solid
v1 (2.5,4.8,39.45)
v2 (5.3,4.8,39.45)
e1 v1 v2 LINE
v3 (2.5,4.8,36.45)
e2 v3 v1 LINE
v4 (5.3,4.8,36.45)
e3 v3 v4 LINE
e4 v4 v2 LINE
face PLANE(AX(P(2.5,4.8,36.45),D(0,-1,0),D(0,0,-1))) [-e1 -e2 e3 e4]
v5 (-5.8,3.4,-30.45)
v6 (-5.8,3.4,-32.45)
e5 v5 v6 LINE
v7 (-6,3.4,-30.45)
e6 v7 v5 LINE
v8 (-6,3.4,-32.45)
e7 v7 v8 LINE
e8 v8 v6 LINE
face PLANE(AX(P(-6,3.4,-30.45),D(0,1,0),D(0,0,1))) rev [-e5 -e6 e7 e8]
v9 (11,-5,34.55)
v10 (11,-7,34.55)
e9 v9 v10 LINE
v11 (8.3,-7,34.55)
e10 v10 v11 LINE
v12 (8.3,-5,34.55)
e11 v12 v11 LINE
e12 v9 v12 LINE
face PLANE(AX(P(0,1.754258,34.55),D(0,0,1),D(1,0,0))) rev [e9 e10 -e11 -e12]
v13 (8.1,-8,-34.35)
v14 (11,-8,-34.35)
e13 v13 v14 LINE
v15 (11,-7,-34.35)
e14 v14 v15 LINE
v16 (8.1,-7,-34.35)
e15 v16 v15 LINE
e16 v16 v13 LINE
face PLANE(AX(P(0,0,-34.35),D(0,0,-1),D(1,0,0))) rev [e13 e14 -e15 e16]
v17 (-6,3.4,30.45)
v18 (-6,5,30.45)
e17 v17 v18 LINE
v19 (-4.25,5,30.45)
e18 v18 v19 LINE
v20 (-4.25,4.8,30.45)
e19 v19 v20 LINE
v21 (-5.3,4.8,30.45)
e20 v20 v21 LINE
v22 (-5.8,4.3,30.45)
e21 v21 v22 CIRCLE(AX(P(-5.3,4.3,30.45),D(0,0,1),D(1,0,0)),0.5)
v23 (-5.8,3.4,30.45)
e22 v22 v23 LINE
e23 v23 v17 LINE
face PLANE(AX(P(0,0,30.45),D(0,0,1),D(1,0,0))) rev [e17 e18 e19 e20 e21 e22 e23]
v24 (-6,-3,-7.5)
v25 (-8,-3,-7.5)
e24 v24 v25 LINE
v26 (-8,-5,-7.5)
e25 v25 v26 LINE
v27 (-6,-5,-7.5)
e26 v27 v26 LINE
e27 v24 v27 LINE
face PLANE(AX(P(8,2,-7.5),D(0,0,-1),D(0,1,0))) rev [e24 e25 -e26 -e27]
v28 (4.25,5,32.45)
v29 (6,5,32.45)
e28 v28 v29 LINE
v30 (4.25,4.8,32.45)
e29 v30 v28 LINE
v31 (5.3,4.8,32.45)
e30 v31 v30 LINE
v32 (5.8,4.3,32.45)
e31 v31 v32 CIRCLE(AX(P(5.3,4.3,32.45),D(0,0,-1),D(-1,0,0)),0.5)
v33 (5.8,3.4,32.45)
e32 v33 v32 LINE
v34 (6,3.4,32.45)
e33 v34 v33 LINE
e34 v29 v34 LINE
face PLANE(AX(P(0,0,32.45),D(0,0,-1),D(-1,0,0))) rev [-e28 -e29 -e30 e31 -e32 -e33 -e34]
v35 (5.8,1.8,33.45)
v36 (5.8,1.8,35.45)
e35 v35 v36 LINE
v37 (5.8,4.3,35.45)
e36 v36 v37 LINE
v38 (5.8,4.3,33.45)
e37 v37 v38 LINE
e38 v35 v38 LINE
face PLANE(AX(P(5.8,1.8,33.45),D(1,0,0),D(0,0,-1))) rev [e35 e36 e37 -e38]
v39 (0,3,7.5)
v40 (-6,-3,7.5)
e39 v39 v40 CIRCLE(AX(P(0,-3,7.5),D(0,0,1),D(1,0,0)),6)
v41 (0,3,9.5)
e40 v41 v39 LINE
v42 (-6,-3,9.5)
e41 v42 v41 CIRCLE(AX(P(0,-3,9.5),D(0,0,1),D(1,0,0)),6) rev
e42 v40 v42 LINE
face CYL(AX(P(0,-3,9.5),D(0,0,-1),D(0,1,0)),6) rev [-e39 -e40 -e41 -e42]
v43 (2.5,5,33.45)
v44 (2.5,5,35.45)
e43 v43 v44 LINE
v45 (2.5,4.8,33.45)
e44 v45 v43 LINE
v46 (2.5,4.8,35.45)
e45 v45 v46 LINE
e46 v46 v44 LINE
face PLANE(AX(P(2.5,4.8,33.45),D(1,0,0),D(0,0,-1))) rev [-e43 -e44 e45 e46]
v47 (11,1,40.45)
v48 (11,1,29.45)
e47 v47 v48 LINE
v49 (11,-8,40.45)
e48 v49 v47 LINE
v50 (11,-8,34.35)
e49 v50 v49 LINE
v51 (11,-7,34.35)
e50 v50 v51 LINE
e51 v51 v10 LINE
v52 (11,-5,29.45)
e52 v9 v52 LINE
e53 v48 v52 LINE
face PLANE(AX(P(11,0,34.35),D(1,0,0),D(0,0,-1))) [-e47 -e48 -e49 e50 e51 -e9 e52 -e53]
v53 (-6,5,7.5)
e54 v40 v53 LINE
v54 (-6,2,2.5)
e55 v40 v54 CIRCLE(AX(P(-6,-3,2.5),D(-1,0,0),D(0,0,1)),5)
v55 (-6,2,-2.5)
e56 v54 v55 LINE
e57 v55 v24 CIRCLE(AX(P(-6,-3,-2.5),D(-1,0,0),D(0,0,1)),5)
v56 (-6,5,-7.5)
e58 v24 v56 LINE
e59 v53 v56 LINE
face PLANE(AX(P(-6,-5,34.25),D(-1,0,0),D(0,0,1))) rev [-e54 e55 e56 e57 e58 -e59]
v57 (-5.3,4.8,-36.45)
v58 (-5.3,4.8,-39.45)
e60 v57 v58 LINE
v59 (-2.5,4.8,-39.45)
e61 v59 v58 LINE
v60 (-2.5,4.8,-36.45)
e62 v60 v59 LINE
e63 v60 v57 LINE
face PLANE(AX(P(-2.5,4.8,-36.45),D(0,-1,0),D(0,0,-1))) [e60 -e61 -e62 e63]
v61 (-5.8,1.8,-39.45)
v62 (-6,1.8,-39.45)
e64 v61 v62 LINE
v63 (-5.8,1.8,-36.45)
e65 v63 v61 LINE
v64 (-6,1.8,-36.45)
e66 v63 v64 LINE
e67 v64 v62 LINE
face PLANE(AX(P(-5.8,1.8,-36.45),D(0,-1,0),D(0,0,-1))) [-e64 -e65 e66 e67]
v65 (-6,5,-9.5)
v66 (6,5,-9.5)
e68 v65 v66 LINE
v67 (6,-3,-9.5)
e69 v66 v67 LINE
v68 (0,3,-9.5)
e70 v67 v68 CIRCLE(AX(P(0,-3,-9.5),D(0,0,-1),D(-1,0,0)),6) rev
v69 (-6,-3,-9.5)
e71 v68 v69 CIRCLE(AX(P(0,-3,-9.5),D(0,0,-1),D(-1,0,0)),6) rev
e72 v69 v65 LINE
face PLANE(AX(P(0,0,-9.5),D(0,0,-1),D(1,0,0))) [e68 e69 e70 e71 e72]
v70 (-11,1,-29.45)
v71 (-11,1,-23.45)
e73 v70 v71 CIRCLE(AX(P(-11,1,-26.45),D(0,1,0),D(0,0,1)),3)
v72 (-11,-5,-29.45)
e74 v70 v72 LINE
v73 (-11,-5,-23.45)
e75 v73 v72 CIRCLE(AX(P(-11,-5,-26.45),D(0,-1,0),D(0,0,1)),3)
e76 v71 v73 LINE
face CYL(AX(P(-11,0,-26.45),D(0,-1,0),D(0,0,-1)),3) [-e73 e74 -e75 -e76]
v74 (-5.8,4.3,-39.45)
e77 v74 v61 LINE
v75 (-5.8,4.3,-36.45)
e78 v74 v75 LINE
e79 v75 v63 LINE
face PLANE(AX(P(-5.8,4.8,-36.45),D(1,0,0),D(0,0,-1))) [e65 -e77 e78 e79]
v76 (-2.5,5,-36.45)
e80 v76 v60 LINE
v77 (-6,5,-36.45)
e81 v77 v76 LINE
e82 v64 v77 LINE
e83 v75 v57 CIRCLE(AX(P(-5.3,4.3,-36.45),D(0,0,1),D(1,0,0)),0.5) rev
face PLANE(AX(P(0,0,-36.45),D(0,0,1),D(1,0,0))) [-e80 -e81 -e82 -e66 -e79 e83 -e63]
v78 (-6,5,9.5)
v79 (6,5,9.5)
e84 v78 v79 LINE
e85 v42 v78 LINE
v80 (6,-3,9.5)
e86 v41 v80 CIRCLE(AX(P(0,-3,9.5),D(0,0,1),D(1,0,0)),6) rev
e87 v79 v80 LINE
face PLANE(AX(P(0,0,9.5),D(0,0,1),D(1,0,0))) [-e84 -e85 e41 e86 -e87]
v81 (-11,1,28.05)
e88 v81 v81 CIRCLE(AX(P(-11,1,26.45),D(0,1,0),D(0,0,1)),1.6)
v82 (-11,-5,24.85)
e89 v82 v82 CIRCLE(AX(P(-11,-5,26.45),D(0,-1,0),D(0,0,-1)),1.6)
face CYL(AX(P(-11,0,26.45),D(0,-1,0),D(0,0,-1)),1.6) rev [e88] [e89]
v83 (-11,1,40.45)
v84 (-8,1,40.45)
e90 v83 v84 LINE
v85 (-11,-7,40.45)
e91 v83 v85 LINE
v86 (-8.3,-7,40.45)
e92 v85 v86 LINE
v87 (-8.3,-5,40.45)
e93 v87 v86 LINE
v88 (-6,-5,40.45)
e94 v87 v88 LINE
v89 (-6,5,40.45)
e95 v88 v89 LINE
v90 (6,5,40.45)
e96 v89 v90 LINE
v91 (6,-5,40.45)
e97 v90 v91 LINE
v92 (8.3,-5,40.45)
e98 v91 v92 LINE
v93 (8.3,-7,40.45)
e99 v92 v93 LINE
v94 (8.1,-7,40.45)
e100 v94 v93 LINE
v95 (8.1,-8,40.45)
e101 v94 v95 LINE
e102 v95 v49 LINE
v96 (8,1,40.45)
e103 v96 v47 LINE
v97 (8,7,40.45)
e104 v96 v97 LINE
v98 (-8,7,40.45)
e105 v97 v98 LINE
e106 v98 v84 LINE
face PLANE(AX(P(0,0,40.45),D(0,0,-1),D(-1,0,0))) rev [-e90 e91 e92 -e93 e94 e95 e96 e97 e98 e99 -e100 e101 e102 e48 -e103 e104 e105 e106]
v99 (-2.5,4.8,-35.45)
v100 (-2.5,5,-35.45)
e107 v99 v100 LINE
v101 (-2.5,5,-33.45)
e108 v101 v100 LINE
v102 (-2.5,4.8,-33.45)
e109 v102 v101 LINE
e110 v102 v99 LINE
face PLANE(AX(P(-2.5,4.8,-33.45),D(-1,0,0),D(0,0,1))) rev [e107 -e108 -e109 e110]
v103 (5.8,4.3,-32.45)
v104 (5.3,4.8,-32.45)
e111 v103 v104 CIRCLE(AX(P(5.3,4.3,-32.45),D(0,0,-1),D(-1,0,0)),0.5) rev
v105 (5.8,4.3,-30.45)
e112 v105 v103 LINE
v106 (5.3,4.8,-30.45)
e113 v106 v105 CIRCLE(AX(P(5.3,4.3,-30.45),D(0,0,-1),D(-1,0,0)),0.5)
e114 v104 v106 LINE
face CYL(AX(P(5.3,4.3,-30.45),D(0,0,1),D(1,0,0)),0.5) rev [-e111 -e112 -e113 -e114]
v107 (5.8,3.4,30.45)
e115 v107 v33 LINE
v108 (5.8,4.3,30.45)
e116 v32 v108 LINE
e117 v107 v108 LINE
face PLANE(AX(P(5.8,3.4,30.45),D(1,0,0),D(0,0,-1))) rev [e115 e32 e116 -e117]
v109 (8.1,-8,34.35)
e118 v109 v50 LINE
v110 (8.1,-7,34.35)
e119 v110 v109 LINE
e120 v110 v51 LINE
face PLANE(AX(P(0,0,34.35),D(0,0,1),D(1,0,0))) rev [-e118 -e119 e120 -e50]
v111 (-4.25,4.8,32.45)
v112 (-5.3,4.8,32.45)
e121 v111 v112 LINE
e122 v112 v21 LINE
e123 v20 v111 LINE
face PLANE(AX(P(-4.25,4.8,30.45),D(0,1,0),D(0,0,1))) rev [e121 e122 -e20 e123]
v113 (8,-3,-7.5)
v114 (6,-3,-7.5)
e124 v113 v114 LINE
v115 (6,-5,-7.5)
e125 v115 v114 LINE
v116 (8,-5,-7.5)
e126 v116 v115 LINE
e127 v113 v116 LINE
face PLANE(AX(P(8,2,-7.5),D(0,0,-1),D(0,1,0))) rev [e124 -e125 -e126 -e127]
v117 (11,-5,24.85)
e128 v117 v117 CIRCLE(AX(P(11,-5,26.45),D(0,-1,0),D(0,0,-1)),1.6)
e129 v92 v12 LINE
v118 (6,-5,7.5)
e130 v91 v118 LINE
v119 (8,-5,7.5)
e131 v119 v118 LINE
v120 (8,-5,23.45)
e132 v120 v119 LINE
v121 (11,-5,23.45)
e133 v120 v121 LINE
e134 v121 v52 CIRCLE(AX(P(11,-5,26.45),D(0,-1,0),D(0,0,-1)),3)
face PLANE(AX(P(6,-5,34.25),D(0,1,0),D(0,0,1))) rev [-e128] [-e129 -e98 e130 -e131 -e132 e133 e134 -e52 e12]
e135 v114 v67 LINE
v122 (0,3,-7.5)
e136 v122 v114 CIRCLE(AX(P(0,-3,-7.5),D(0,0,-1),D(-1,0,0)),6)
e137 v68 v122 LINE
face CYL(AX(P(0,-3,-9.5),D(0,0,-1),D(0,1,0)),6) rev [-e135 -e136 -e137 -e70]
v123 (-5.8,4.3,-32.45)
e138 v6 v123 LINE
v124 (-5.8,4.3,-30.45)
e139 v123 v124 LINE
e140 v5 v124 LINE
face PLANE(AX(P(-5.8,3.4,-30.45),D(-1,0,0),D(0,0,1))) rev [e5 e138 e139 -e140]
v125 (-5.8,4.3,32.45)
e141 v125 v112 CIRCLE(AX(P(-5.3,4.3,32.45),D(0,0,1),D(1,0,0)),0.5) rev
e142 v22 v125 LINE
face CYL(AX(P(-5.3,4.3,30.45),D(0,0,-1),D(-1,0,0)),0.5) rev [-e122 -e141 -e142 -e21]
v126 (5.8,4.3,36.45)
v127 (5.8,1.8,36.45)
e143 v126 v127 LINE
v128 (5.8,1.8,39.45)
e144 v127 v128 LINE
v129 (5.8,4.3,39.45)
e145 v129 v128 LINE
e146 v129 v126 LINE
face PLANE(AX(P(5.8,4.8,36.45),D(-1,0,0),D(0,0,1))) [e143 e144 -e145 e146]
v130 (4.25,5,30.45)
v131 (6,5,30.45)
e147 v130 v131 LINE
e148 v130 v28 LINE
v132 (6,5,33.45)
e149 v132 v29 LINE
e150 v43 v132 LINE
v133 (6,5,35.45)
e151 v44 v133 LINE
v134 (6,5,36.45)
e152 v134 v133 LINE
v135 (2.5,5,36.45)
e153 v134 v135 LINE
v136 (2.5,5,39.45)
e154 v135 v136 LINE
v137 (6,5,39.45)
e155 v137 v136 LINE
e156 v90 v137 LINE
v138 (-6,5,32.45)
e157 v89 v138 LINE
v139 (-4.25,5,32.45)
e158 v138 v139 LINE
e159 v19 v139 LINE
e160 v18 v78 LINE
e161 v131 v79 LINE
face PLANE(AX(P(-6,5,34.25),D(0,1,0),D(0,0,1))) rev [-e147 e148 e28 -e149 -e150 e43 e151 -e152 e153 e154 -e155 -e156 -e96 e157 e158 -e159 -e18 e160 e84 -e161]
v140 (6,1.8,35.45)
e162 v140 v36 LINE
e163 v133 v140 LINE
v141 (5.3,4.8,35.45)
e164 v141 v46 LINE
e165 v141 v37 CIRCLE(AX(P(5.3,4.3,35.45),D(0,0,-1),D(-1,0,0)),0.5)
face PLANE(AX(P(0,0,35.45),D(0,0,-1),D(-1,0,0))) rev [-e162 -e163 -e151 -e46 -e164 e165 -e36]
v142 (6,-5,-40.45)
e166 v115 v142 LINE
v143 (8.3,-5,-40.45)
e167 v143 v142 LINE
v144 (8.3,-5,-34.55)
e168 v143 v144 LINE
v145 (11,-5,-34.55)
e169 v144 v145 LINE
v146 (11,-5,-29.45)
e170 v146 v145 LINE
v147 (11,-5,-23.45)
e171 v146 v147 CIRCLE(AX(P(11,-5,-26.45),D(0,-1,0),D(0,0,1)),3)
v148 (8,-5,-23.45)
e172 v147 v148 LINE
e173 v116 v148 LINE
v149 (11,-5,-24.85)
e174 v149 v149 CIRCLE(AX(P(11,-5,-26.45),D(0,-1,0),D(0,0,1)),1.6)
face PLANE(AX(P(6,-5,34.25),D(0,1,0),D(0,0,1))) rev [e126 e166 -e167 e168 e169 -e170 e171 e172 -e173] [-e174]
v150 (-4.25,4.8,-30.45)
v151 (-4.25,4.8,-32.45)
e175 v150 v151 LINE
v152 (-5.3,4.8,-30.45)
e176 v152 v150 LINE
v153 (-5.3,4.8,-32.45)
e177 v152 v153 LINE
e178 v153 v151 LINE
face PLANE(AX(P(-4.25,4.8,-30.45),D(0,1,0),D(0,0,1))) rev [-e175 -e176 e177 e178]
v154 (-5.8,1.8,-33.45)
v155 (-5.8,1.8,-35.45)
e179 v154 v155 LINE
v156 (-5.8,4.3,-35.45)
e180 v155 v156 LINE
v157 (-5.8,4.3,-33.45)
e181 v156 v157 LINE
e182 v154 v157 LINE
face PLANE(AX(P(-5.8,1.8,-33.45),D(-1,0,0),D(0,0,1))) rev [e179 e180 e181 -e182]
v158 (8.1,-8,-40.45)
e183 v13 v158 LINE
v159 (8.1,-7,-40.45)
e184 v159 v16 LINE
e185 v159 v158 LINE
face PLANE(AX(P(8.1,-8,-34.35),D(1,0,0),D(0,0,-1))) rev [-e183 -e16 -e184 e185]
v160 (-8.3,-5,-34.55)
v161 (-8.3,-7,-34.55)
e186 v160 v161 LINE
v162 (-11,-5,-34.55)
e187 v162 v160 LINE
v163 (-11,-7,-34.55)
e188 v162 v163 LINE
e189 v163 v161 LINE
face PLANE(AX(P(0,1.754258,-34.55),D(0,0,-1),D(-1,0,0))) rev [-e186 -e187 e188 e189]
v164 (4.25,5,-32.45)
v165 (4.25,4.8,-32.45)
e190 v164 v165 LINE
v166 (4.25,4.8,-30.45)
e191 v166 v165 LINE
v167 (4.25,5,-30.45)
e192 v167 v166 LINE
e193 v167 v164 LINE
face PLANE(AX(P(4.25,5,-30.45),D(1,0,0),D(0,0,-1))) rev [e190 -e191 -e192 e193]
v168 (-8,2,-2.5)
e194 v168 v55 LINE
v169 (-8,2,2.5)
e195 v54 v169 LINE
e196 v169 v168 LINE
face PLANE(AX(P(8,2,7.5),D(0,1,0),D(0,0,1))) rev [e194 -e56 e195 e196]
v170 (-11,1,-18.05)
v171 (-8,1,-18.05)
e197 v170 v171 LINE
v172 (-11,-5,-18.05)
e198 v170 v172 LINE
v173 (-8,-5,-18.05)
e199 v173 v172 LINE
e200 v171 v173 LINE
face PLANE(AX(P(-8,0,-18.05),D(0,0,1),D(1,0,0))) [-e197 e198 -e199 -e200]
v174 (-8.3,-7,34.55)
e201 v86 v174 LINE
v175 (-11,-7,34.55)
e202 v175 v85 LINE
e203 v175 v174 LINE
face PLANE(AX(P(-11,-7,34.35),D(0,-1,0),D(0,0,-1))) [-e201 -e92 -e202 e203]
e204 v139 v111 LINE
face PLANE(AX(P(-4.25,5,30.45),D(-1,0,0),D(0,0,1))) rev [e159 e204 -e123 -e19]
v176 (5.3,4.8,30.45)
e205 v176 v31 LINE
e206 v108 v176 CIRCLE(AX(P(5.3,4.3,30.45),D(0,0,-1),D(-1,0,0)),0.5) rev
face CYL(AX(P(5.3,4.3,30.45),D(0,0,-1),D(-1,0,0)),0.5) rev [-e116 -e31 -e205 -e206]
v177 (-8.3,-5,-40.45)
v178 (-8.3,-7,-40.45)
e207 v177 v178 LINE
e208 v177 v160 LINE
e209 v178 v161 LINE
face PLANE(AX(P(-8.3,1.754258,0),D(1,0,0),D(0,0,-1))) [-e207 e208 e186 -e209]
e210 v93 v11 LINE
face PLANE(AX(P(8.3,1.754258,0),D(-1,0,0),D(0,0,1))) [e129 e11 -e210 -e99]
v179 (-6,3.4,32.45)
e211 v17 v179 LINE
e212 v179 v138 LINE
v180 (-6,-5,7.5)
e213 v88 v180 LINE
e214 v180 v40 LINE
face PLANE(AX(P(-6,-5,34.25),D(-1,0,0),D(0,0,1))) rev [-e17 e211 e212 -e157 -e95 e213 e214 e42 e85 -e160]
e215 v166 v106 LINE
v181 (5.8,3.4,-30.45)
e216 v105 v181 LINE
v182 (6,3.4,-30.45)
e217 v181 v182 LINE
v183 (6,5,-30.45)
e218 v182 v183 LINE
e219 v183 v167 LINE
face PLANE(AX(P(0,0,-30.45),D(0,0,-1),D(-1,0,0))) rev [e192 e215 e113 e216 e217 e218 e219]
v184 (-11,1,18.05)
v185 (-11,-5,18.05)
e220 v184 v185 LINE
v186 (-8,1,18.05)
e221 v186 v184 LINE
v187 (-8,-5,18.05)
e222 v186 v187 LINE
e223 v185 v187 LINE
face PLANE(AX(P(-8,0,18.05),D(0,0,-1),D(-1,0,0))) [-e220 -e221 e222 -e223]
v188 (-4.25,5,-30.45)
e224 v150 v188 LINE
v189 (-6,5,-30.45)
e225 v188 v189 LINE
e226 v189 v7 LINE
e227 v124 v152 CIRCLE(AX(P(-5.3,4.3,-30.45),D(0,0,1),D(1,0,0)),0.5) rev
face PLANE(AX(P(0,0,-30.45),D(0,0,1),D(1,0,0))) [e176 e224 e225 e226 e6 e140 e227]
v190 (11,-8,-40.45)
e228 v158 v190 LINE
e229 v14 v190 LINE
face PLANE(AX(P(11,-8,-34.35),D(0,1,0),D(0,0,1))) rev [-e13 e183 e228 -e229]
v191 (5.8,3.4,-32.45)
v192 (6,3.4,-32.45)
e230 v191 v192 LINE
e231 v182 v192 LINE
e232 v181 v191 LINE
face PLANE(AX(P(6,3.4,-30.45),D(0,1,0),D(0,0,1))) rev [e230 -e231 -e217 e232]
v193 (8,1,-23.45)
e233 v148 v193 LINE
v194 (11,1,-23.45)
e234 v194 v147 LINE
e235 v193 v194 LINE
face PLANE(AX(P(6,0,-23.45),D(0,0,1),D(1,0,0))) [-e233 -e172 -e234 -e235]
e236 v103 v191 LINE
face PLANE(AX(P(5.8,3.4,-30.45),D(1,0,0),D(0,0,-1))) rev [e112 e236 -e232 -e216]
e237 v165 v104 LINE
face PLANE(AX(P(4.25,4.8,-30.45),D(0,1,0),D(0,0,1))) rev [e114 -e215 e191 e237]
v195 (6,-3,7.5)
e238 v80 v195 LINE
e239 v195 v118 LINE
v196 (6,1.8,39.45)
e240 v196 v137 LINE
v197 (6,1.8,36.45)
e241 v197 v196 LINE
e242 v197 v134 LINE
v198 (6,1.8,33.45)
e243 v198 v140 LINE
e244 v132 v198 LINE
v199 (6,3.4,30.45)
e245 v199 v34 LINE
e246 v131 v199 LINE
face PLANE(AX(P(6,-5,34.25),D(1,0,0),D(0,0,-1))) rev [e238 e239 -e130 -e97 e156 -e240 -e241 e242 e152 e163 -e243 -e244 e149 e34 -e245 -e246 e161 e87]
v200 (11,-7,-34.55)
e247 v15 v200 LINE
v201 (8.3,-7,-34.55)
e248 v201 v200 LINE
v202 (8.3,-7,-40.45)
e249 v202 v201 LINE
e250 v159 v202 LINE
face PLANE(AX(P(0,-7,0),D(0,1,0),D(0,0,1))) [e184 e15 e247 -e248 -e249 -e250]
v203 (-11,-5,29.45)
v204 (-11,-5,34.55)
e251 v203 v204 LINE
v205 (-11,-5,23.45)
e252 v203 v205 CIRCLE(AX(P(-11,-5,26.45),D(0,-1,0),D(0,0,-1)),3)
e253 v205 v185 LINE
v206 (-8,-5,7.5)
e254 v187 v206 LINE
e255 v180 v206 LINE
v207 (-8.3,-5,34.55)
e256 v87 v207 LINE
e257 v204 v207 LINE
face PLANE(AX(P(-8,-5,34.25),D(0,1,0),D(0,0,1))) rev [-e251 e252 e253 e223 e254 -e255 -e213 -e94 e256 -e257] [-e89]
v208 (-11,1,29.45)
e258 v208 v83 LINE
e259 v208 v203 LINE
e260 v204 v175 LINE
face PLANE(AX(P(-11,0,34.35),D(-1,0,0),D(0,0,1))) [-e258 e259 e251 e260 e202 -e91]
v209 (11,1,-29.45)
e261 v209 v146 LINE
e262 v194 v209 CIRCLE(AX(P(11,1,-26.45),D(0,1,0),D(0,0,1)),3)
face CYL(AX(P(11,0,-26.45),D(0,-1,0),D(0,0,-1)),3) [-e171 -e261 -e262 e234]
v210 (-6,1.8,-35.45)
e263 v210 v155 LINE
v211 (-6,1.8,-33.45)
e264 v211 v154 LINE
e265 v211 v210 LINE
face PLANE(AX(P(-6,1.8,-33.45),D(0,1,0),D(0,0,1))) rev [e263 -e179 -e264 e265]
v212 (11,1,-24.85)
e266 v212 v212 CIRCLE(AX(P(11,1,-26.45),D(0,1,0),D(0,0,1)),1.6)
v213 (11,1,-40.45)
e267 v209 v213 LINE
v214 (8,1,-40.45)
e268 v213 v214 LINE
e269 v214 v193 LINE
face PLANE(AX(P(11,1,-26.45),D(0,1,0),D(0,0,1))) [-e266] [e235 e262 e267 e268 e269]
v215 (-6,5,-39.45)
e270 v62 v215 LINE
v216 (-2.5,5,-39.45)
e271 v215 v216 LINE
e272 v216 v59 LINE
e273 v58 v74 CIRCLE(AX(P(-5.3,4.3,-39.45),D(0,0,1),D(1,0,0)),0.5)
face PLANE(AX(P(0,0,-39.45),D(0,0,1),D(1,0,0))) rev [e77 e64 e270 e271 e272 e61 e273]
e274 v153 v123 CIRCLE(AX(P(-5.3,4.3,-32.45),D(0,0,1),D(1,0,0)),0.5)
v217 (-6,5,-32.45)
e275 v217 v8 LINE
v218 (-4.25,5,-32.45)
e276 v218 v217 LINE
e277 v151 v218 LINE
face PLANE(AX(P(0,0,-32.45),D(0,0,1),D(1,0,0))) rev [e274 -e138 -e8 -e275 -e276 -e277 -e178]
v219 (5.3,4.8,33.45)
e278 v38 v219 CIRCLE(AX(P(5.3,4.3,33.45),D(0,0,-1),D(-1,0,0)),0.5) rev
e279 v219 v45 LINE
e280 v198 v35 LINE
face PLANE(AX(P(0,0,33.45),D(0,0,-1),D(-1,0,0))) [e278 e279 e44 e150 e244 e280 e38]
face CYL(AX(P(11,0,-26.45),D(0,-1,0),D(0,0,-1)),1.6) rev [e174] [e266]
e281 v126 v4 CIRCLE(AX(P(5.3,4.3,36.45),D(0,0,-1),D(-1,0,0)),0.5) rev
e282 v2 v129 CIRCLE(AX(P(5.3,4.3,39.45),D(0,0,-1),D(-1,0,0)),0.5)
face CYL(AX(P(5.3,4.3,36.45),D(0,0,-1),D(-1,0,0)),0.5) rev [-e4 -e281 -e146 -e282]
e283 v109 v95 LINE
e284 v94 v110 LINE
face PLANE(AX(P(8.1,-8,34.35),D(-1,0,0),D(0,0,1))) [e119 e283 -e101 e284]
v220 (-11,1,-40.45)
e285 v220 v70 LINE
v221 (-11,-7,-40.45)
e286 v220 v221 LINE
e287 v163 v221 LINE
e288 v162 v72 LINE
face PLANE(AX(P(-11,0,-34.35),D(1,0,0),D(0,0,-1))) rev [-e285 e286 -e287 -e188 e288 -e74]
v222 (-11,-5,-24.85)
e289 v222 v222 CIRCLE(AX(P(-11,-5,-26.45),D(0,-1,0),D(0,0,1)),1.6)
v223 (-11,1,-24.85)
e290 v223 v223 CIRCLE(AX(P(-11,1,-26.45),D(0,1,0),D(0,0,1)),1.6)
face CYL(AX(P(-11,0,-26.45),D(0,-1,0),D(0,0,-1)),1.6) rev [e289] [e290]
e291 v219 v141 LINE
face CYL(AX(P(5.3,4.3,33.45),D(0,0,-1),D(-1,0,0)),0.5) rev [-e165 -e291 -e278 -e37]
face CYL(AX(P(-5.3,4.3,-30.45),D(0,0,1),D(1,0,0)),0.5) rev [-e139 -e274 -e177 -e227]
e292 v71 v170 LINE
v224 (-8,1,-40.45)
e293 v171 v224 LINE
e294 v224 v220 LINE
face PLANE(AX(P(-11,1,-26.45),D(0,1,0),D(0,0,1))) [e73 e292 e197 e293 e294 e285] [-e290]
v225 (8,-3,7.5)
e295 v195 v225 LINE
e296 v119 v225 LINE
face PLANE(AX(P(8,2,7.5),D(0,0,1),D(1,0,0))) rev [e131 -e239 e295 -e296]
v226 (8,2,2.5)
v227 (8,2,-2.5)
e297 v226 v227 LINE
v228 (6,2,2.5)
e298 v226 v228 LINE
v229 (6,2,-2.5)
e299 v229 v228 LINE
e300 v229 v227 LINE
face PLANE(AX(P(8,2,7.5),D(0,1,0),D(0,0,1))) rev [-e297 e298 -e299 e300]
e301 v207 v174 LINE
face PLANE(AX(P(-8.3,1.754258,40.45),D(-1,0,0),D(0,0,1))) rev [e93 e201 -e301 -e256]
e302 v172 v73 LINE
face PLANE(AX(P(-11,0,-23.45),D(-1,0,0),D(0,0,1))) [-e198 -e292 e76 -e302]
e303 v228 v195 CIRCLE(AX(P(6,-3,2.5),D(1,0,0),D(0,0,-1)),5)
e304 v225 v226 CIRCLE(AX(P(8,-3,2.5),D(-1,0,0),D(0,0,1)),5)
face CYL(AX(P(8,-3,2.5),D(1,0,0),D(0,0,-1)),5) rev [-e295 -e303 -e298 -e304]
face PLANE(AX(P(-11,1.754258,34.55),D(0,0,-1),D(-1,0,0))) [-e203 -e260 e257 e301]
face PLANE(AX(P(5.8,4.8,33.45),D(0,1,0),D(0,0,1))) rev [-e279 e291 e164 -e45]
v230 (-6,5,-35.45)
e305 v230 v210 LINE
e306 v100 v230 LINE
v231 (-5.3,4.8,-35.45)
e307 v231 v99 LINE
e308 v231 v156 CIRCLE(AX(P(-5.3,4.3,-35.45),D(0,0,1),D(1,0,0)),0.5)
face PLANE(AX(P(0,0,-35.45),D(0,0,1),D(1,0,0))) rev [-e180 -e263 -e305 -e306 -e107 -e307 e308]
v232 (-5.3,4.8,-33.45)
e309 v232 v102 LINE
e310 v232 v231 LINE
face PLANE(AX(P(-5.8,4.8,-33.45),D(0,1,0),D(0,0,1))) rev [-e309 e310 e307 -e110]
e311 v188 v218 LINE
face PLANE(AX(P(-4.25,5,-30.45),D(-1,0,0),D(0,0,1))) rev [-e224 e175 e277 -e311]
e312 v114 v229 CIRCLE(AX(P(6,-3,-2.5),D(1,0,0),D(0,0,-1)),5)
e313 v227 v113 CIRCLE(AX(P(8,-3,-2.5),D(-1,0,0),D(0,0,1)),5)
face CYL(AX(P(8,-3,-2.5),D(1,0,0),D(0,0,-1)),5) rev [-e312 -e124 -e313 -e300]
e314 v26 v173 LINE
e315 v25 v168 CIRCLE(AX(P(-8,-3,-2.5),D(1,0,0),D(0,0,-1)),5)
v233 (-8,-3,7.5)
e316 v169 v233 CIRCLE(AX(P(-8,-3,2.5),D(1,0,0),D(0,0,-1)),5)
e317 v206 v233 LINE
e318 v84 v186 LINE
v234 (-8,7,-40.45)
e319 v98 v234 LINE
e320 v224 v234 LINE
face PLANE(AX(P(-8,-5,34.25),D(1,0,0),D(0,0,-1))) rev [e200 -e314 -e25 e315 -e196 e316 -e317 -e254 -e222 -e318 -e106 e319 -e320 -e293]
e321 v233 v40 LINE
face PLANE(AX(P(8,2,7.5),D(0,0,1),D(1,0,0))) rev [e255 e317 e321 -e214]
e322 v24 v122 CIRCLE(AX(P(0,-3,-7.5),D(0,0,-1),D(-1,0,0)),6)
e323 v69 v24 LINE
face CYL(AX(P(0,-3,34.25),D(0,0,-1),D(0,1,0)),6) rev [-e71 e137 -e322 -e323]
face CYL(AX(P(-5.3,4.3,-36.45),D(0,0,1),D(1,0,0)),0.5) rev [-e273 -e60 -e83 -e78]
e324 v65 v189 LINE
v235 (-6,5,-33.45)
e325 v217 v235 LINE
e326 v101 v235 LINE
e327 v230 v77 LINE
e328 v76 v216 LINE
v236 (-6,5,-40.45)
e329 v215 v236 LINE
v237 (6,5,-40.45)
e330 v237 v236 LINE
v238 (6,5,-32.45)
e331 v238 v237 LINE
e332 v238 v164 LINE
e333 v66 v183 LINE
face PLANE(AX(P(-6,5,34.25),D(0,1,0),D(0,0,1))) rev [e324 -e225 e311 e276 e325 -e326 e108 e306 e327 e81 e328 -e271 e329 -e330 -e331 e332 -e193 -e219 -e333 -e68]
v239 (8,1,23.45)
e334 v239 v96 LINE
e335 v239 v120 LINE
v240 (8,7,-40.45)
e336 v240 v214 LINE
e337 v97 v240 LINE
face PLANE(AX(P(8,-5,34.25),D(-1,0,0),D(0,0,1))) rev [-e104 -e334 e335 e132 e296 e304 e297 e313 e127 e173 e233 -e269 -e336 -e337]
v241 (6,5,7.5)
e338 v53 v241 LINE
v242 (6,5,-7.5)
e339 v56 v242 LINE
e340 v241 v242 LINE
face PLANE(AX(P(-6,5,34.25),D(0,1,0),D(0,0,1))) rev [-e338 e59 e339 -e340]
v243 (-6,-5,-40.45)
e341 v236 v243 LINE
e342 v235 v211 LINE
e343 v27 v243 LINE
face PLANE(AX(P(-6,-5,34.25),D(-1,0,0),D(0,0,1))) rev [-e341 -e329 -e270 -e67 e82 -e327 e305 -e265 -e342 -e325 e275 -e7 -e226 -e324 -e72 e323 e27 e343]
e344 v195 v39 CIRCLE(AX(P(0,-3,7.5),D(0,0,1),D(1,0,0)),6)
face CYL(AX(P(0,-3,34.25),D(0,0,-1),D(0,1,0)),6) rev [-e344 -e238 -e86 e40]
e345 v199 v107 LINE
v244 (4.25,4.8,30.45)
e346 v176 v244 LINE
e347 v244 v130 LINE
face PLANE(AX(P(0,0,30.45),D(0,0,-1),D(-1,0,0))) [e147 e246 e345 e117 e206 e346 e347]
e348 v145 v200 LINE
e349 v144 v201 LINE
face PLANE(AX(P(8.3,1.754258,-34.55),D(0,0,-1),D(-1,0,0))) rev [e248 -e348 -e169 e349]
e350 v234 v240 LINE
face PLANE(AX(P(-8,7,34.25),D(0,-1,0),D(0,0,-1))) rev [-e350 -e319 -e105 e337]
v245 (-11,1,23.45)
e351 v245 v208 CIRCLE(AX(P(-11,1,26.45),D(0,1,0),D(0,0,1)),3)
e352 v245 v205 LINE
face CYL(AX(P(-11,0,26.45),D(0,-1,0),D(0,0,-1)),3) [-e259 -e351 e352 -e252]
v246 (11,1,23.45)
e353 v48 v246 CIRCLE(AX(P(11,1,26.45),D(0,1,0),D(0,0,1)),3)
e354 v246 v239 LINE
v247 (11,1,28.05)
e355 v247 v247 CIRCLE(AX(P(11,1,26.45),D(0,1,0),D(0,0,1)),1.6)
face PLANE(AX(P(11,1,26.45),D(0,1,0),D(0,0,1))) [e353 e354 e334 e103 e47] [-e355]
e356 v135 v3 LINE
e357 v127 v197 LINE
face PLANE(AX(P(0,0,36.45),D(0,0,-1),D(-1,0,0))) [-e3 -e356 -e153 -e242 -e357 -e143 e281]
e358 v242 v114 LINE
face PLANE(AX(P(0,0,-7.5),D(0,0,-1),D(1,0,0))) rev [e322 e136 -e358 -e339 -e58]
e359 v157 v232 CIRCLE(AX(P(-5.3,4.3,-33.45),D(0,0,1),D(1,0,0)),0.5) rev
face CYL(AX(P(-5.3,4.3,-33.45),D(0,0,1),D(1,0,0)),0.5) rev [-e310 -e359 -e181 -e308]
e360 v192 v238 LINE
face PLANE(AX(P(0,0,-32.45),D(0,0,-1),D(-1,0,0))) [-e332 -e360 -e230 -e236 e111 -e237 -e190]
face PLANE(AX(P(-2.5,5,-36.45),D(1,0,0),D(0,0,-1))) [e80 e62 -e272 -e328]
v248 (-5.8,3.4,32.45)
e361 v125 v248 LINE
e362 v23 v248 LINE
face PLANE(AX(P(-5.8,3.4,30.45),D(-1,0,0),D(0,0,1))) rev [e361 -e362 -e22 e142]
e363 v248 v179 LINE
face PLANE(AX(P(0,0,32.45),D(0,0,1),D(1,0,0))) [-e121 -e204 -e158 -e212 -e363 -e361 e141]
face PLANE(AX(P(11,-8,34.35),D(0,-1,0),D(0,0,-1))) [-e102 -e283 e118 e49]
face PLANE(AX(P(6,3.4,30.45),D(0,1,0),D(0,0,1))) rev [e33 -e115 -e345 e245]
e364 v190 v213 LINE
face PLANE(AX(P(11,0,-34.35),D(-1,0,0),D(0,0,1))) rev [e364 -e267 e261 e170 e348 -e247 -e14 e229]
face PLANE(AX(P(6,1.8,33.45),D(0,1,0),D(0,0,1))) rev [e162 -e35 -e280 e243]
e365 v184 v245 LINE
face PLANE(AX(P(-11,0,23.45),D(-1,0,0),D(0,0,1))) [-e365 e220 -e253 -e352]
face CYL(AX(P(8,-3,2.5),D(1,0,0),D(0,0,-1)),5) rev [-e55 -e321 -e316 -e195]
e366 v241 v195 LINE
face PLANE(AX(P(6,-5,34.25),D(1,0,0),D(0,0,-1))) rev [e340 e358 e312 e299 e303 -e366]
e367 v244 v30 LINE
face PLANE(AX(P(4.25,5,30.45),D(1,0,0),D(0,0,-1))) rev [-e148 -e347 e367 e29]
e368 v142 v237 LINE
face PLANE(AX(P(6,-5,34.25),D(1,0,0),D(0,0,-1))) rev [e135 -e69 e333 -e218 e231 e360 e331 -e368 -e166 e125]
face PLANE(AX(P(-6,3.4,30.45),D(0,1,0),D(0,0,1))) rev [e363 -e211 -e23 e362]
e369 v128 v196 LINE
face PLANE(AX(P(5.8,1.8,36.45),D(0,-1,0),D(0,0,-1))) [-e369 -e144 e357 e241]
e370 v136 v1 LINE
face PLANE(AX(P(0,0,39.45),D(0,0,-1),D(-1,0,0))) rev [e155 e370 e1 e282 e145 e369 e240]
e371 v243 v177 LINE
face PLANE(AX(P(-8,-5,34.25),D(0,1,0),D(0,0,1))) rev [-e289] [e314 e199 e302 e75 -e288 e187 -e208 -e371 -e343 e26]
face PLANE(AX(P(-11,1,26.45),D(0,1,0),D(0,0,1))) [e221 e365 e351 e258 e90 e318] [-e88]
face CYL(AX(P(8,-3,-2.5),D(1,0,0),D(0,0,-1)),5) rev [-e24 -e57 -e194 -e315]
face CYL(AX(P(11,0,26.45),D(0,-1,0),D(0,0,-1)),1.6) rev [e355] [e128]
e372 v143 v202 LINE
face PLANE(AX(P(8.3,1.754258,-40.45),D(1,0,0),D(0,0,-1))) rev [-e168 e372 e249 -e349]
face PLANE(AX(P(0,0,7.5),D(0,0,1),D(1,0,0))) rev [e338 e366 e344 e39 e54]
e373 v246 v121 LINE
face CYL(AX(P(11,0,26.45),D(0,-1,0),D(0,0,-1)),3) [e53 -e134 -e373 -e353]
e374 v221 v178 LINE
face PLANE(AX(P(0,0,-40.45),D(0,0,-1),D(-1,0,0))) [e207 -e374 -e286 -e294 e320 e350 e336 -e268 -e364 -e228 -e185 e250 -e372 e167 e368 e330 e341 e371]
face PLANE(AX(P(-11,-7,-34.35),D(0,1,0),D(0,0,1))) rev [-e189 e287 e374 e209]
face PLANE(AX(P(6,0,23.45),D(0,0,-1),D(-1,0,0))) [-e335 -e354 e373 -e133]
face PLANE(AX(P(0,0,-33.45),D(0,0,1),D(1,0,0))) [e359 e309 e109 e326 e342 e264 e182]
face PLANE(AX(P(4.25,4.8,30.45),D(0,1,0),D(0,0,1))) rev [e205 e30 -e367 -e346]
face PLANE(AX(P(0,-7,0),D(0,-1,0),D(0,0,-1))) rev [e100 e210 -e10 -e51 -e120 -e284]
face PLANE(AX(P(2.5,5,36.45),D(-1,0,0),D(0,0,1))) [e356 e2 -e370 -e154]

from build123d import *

# Parameters (mm, degrees)
BOSS_EXTRUDE1_DEPTH      = 34.25
BOSS_EXTRUDE2_DEPTH      = 6.2
BOSS_EXTRUDE3_DEPTH      = 6.2
SKETCH9_R                = 1.6
BOSS_EXTRUDE4_DEPTH      = 5
CUT_EXTRUDE1_START       = -16
SKETCH10_W               = 15
SKETCH10_H               = 7
CUT_EXTRUDE1_DEPTH       = 16
SKETCH11_W               = 12
SKETCH11_H               = 2
BOSS_EXTRUDE5_DEPTH      = 2
FILLET1_R                = 6
BOSS_EXTRUDE6_DEPTH      = 3
BOSS_EXTRUDE7_DEPTH      = 2
BOSS_EXTRUDE8_DEPTH      = 2
CIRPATTERN1_COUNT        = 2
FILLET2_R                = 0.5
FILLET4_R                = 5
BOSS_EXTRUDE9_DEPTH      = 6.1
BOSS_EXTRUDE10_START     = -5
BOSS_EXTRUDE10_OUTLINE_W = 3
BOSS_EXTRUDE10_OUTLINE_H = 4.9
BOSS_EXTRUDE10_DEPTH     = 5
SKETCH17_W               = 3
SKETCH17_H               = 4.9
BOSS_EXTRUDE11_DEPTH     = 5
BOSS_EXTRUDE12_START     = -5
BOSS_EXTRUDE12_OUTLINE_W = 3
BOSS_EXTRUDE12_OUTLINE_H = 5.4
BOSS_EXTRUDE12_DEPTH     = 5
CUT_EXTRUDE2_DEPTH       = 2
SKETCH21_R               = 1.6
BOSS_EXTRUDE13_DEPTH     = 1


# Read off the part's stored shape, not the designer's step: Boss-Extrude10, Boss-Extrude12
# Some blends are built 0.0001 mm under size
with BuildPart() as part:
    # Sketch1 → Boss-Extrude1 (new, symmetric)
    with BuildSketch(Plane.XY):
        Polygon((-8, -5), (-8, 7), (8, 7), (8, -5), (6, -5), (6, 5), (-6, 5), (-6, -5), align=None)
    extrude(amount=BOSS_EXTRUDE1_DEPTH, both=True)

    # Sketch6 → Boss-Extrude2 (add)
    with BuildSketch(Plane.XY.offset(34.25)):
        Polygon((6, 5), (6, -5), (8, -5), (8, 7), (-8, 7), (-8, -5), (-6, -5), (-6, 5), align=None)
    extrude(amount=BOSS_EXTRUDE2_DEPTH)

    # Sketch8 → Boss-Extrude3 (add)
    with BuildSketch(Plane(origin=(0, 0, -34.25), x_dir=(-1, 0, 0), z_dir=(0, 0, -1))):
        Polygon((-6, -5), (-6, 5), (6, 5), (6, -5), (8, -5), (8, 7), (-8, 7), (-8, -5), align=None)
    extrude(amount=BOSS_EXTRUDE3_DEPTH)

    # Sketch9 → Boss-Extrude4 (add)
    # profile 1 of 4: a face of its own
    with BuildSketch(Plane.XZ.offset(5)):
        with BuildLine():
            Line((-11, 29.45), (-6, 29.45))
            Line((-6, 29.45), (-6, 23.45))
            Line((-6, 23.45), (-11, 23.45))
            ThreePointArc((-11, 23.45), (-14, 26.45), (-11, 29.45))
        make_face()
        with Locations(Location((-11, 26.45, 0), (0, 0, 270))):
            Circle(SKETCH9_R, mode=Mode.SUBTRACT)
    # profile 2 of 4: a face of its own
    with BuildSketch(Plane.XZ.offset(5)):
        with BuildLine():
            Line((11, 29.45), (6, 29.45))
            Line((6, 29.45), (6, 23.45))
            Line((6, 23.45), (11, 23.45))
            ThreePointArc((11, 23.45), (14, 26.45), (11, 29.45))
        make_face()
        with Locations(Location((11, 26.45, 0), (0, 0, 270))):
            Circle(SKETCH9_R, mode=Mode.SUBTRACT)
    # profile 3 of 4: a face of its own
    with BuildSketch(Plane.XZ.offset(5)):
        with BuildLine():
            Line((6, -23.45), (11, -23.45))
            ThreePointArc((11, -23.45), (14, -26.45), (11, -29.45))
            Line((11, -29.45), (6, -29.45))
            Line((6, -29.45), (6, -23.45))
        make_face()
        with Locations(Location((11, -26.45, 0), (0, 0, 90))):
            Circle(SKETCH9_R, mode=Mode.SUBTRACT)
    # profile 4 of 4: a face of its own
    with BuildSketch(Plane.XZ.offset(5)):
        with BuildLine():
            Line((-6, -23.45), (-11, -23.45))
            ThreePointArc((-11, -23.45), (-14, -26.45), (-11, -29.45))
            Line((-11, -29.45), (-6, -29.45))
            Line((-6, -29.45), (-6, -23.45))
        make_face()
        with Locations(Location((-11, -26.45, 0), (0, 0, 90))):
            Circle(SKETCH9_R, mode=Mode.SUBTRACT)
    extrude(amount=-BOSS_EXTRUDE4_DEPTH)

    # Sketch10 → Cut-Extrude1 (cut)
    with BuildSketch(Plane.ZY.offset(8).offset(CUT_EXTRUDE1_START)):
        with Locations((0, -1.5)):
            Rectangle(SKETCH10_W, SKETCH10_H)
    extrude(amount=CUT_EXTRUDE1_DEPTH, mode=Mode.SUBTRACT)

    # Sketch11 → Boss-Extrude5 (add)
    with BuildSketch(Plane(origin=(0, 0, 7.5), x_dir=(-1, 0, 0), z_dir=(0, 0, -1))):
        with Locations((0, 4)):
            Rectangle(SKETCH11_W, SKETCH11_H)
    boss_extrude5 = extrude(amount=-BOSS_EXTRUDE5_DEPTH)

    # Mirror1: Boss-Extrude5 across plane
    add(boss_extrude5.mirror(Plane.XY))

    # Fillet1
    # the kernel refuses this fillet: 6 mm, written as the material it adds along each edge
    with BuildSketch(Plane(origin=(-6, 3, -7.5), x_dir=(0, -1, 0), z_dir=(0, 0, -1)), Plane(origin=(6, 3, 7.5), x_dir=(0, -1, 0), z_dir=(0, 0, 1))) as fillet1_piece_1:
        with BuildLine():
            CenterArc((FILLET1_R, -FILLET1_R), FILLET1_R, 90, 90)
            Line((0, -FILLET1_R), (0, 0))
            Line((0, 0), (FILLET1_R, 0))
        make_face()
    extrude(amount=2)
    with BuildSketch(Plane(origin=(6, 3, -7.5), x_dir=(0, -1, 0), z_dir=(0, 0, -1)), Plane(origin=(-6, 3, 7.5), x_dir=(0, -1, 0), z_dir=(0, 0, 1))) as fillet1_piece_2:
        with BuildLine():
            CenterArc((FILLET1_R, FILLET1_R), FILLET1_R, 180, 90)
            Line((0, FILLET1_R), (0, 0))
            Line((0, 0), (FILLET1_R, 0))
        make_face()
    extrude(amount=2)

    # Sketch12 → Boss-Extrude6 (add)
    with BuildSketch(Plane.XY.offset(39.45)):
        Polygon((2.5, 5), (2.5, 4.8), (5.8, 4.8), (5.8, 1.8), (6, 1.8), (6, 5), align=None)
    boss_extrude6 = extrude(amount=-BOSS_EXTRUDE6_DEPTH)

    # Sketch13 → Boss-Extrude7 (add)
    with BuildSketch(Plane(origin=(0, 0, 35.45), x_dir=(-1, 0, 0), z_dir=(0, 0, -1))):
        Polygon((-2.5, 5), (-6, 5), (-6, 1.8), (-5.8, 1.8), (-5.8, 4.8), (-2.5, 4.8), align=None)
    boss_extrude7 = extrude(amount=BOSS_EXTRUDE7_DEPTH)

    # Sketch14 → Boss-Extrude8 (add)
    with BuildSketch(Plane(origin=(0, 0, 32.45), x_dir=(-1, 0, 0), z_dir=(0, 0, -1))):
        Polygon((-6, 5), (-4.25, 5), (-4.25, 4.8), (-5.8, 4.8), (-5.8, 3.4), (-6, 3.4), align=None)
        Polygon((5.8, 3.4), (5.8, 4.8), (4.25, 4.8), (4.25, 5), (6, 5), (6, 3.4), align=None)
    boss_extrude8 = extrude(amount=BOSS_EXTRUDE8_DEPTH)

    # CirPattern1: Boss-Extrude6, Boss-Extrude7, Boss-Extrude8 ×2 about axis
    cirpattern1_axis = Axis((0, 0, 0), (0, 1, 0))
    add([boss_extrude6.rotate(cirpattern1_axis, i * 360 / CIRPATTERN1_COUNT) for i in range(1, CIRPATTERN1_COUNT)])
    add([boss_extrude7.rotate(cirpattern1_axis, i * 360 / CIRPATTERN1_COUNT) for i in range(1, CIRPATTERN1_COUNT)])
    add([boss_extrude8.rotate(cirpattern1_axis, i * 360 / CIRPATTERN1_COUNT) for i in range(1, CIRPATTERN1_COUNT)])

    # Fillet2
    fillet2_edges = [part.edges().sort_by_distance(p)[0] for p in [
        (5.8, 4.8, 37.95),
        (5.8, 4.8, 34.45),
        (5.8, 4.8, 31.45),
        (-5.8, 4.8, 31.45),
        (-5.8, 4.8, -37.95),
        (-5.8, 4.8, -34.45),
        (-5.8, 4.8, -31.45),
        (5.8, 4.8, -31.45),
    ]]
    fillet(fillet2_edges, radius=FILLET2_R)

    # Fillet4
    fillet4_edges = [part.edges().sort_by_distance(p)[0] for p in [
        (7, 2, -7.5),
        (-7, 2, -7.5),
        (7, 2, 7.5),
        (-7, 2, 7.5),
    ]]
    fillet(fillet4_edges, radius=FILLET4_R - 0.0001)  # a hair under: the kernel refuses the full size

    # Sketch15 → Boss-Extrude9 (add)
    with BuildSketch(Plane.XY.offset(40.45)):
        Polygon((8, -5), (8.1, -5), (8.1, -8), (11, -8), (11, 0), (8, 0), align=None)
        Polygon((-8, -5), (-8.1, -5), (-8.1, -7), (-11, -7), (-11, 0), (-8, 0), align=None)
    boss_extrude9 = extrude(amount=-BOSS_EXTRUDE9_DEPTH)

    # Boss-Extrude10 outline → Boss-Extrude10 (add)
    with BuildSketch(Plane(origin=(0, 0, 0), x_dir=(1, 0, 0), z_dir=(0, 1, 0)).offset(BOSS_EXTRUDE10_START)):
        with Locations((9.5, -31.9)):
            Rectangle(BOSS_EXTRUDE10_OUTLINE_W, BOSS_EXTRUDE10_OUTLINE_H)
        with Locations((-9.5, -31.9)):
            Rectangle(BOSS_EXTRUDE10_OUTLINE_W, BOSS_EXTRUDE10_OUTLINE_H)
    extrude(amount=BOSS_EXTRUDE10_DEPTH)

    # Mirror3: Boss-Extrude9 across plane
    add(boss_extrude9.mirror(Plane.XY))

    # Sketch17 → Boss-Extrude11 (add)
    with BuildSketch(Plane(origin=(0, 0, 0), x_dir=(1, 0, 0), z_dir=(0, 1, 0))):
        with Locations((-9.5, 31.9)):
            Rectangle(SKETCH17_W, SKETCH17_H)
        with Locations((9.5, 31.9)):
            Rectangle(SKETCH17_W, SKETCH17_H)
    extrude(amount=-BOSS_EXTRUDE11_DEPTH)

    # Boss-Extrude12 outline → Boss-Extrude12 (add)
    with BuildSketch(Plane.XZ.offset(5).offset(BOSS_EXTRUDE12_START)):
        with Locations((-9.5, -20.75)):
            Rectangle(BOSS_EXTRUDE12_OUTLINE_W, BOSS_EXTRUDE12_OUTLINE_H)
        with Locations((-9.5, 20.75)):
            Rectangle(BOSS_EXTRUDE12_OUTLINE_W, BOSS_EXTRUDE12_OUTLINE_H)
    extrude(amount=BOSS_EXTRUDE12_DEPTH)

    # Sketch20 → Cut-Extrude2 (cut)
    with BuildSketch(Plane.XZ.offset(7)):
        Polygon((-8.3, -34.35), (-11, -34.35), (-11, -34.55), (-8.3, -34.55), (-8.3, -40.45), (-8.1, -40.45), (-8.1, -34.55), (-8.1, -34.35), align=None)
        Polygon((8.3, 40.45), (8.1, 40.45), (8.1, 34.55), (8.1, 34.35), (8.3, 34.35), (11, 34.35), (11, 34.55), (8.3, 34.55), align=None)
        Polygon((8.1, -34.35), (11, -34.35), (11, -34.55), (8.3, -34.55), (8.3, -40.45), (8.1, -40.45), align=None)
        Polygon((-11, 34.35), (-8.1, 34.35), (-8.1, 40.45), (-8.3, 40.45), (-8.3, 34.55), (-11, 34.55), align=None)
    extrude(amount=-CUT_EXTRUDE2_DEPTH, mode=Mode.SUBTRACT)

    # Sketch21 → Boss-Extrude13 (add)
    # profile 1 of 4: a face of its own
    with BuildSketch(Plane(origin=(0, 0, 0), x_dir=(1, 0, 0), z_dir=(0, 1, 0))):
        with BuildLine():
            Line((-11, -29.45), (-11, -40.45))
            Line((-11, -40.45), (-8, -40.45))
            Line((-8, -40.45), (-8, -18.05))
            Line((-8, -18.05), (-11, -18.05))
            Line((-11, -18.05), (-11, -23.45))
            ThreePointArc((-11, -23.45), (-14, -26.45), (-11, -29.45))
        make_face()
        with Locations(Location((-11, -26.45, 0), (0, 0, 90))):
            Circle(SKETCH21_R, mode=Mode.SUBTRACT)
    # profile 2 of 4: a face of its own
    with BuildSketch(Plane(origin=(0, 0, 0), x_dir=(1, 0, 0), z_dir=(0, 1, 0))):
        with BuildLine():
            Line((11, -23.45), (8, -23.45))
            Line((8, -23.45), (8, -40.45))
            Line((8, -40.45), (11, -40.45))
            Line((11, -40.45), (11, -29.45))
            ThreePointArc((11, -29.45), (14, -26.45), (11, -23.45))
        make_face()
        with Locations(Location((11, -26.45, 0), (0, 0, 90))):
            Circle(SKETCH21_R, mode=Mode.SUBTRACT)
    # profile 3 of 4: a face of its own
    with BuildSketch(Plane(origin=(0, 0, 0), x_dir=(1, 0, 0), z_dir=(0, 1, 0))):
        with BuildLine():
            Line((8, 40.45), (8, 23.45))
            Line((8, 23.45), (11, 23.45))
            ThreePointArc((11, 23.45), (14, 26.45), (11, 29.45))
            Line((11, 29.45), (11, 40.45))
            Line((11, 40.45), (8, 40.45))
        make_face()
        with Locations(Location((11, 26.45, 0), (0, 0, 270))):
            Circle(SKETCH21_R, mode=Mode.SUBTRACT)
    # profile 4 of 4: a face of its own
    with BuildSketch(Plane(origin=(0, 0, 0), x_dir=(1, 0, 0), z_dir=(0, 1, 0))):
        with BuildLine():
            Line((-8, 18.05), (-8, 40.45))
            Line((-8, 40.45), (-11, 40.45))
            Line((-11, 40.45), (-11, 29.45))
            ThreePointArc((-11, 29.45), (-14, 26.45), (-11, 23.45))
            Line((-11, 23.45), (-11, 18.05))
            Line((-11, 18.05), (-8, 18.05))
        make_face()
        with Locations(Location((-11, 26.45, 0), (0, 0, 270))):
            Circle(SKETCH21_R, mode=Mode.SUBTRACT)
    extrude(amount=BOSS_EXTRUDE13_DEPTH)


solid = part.part
